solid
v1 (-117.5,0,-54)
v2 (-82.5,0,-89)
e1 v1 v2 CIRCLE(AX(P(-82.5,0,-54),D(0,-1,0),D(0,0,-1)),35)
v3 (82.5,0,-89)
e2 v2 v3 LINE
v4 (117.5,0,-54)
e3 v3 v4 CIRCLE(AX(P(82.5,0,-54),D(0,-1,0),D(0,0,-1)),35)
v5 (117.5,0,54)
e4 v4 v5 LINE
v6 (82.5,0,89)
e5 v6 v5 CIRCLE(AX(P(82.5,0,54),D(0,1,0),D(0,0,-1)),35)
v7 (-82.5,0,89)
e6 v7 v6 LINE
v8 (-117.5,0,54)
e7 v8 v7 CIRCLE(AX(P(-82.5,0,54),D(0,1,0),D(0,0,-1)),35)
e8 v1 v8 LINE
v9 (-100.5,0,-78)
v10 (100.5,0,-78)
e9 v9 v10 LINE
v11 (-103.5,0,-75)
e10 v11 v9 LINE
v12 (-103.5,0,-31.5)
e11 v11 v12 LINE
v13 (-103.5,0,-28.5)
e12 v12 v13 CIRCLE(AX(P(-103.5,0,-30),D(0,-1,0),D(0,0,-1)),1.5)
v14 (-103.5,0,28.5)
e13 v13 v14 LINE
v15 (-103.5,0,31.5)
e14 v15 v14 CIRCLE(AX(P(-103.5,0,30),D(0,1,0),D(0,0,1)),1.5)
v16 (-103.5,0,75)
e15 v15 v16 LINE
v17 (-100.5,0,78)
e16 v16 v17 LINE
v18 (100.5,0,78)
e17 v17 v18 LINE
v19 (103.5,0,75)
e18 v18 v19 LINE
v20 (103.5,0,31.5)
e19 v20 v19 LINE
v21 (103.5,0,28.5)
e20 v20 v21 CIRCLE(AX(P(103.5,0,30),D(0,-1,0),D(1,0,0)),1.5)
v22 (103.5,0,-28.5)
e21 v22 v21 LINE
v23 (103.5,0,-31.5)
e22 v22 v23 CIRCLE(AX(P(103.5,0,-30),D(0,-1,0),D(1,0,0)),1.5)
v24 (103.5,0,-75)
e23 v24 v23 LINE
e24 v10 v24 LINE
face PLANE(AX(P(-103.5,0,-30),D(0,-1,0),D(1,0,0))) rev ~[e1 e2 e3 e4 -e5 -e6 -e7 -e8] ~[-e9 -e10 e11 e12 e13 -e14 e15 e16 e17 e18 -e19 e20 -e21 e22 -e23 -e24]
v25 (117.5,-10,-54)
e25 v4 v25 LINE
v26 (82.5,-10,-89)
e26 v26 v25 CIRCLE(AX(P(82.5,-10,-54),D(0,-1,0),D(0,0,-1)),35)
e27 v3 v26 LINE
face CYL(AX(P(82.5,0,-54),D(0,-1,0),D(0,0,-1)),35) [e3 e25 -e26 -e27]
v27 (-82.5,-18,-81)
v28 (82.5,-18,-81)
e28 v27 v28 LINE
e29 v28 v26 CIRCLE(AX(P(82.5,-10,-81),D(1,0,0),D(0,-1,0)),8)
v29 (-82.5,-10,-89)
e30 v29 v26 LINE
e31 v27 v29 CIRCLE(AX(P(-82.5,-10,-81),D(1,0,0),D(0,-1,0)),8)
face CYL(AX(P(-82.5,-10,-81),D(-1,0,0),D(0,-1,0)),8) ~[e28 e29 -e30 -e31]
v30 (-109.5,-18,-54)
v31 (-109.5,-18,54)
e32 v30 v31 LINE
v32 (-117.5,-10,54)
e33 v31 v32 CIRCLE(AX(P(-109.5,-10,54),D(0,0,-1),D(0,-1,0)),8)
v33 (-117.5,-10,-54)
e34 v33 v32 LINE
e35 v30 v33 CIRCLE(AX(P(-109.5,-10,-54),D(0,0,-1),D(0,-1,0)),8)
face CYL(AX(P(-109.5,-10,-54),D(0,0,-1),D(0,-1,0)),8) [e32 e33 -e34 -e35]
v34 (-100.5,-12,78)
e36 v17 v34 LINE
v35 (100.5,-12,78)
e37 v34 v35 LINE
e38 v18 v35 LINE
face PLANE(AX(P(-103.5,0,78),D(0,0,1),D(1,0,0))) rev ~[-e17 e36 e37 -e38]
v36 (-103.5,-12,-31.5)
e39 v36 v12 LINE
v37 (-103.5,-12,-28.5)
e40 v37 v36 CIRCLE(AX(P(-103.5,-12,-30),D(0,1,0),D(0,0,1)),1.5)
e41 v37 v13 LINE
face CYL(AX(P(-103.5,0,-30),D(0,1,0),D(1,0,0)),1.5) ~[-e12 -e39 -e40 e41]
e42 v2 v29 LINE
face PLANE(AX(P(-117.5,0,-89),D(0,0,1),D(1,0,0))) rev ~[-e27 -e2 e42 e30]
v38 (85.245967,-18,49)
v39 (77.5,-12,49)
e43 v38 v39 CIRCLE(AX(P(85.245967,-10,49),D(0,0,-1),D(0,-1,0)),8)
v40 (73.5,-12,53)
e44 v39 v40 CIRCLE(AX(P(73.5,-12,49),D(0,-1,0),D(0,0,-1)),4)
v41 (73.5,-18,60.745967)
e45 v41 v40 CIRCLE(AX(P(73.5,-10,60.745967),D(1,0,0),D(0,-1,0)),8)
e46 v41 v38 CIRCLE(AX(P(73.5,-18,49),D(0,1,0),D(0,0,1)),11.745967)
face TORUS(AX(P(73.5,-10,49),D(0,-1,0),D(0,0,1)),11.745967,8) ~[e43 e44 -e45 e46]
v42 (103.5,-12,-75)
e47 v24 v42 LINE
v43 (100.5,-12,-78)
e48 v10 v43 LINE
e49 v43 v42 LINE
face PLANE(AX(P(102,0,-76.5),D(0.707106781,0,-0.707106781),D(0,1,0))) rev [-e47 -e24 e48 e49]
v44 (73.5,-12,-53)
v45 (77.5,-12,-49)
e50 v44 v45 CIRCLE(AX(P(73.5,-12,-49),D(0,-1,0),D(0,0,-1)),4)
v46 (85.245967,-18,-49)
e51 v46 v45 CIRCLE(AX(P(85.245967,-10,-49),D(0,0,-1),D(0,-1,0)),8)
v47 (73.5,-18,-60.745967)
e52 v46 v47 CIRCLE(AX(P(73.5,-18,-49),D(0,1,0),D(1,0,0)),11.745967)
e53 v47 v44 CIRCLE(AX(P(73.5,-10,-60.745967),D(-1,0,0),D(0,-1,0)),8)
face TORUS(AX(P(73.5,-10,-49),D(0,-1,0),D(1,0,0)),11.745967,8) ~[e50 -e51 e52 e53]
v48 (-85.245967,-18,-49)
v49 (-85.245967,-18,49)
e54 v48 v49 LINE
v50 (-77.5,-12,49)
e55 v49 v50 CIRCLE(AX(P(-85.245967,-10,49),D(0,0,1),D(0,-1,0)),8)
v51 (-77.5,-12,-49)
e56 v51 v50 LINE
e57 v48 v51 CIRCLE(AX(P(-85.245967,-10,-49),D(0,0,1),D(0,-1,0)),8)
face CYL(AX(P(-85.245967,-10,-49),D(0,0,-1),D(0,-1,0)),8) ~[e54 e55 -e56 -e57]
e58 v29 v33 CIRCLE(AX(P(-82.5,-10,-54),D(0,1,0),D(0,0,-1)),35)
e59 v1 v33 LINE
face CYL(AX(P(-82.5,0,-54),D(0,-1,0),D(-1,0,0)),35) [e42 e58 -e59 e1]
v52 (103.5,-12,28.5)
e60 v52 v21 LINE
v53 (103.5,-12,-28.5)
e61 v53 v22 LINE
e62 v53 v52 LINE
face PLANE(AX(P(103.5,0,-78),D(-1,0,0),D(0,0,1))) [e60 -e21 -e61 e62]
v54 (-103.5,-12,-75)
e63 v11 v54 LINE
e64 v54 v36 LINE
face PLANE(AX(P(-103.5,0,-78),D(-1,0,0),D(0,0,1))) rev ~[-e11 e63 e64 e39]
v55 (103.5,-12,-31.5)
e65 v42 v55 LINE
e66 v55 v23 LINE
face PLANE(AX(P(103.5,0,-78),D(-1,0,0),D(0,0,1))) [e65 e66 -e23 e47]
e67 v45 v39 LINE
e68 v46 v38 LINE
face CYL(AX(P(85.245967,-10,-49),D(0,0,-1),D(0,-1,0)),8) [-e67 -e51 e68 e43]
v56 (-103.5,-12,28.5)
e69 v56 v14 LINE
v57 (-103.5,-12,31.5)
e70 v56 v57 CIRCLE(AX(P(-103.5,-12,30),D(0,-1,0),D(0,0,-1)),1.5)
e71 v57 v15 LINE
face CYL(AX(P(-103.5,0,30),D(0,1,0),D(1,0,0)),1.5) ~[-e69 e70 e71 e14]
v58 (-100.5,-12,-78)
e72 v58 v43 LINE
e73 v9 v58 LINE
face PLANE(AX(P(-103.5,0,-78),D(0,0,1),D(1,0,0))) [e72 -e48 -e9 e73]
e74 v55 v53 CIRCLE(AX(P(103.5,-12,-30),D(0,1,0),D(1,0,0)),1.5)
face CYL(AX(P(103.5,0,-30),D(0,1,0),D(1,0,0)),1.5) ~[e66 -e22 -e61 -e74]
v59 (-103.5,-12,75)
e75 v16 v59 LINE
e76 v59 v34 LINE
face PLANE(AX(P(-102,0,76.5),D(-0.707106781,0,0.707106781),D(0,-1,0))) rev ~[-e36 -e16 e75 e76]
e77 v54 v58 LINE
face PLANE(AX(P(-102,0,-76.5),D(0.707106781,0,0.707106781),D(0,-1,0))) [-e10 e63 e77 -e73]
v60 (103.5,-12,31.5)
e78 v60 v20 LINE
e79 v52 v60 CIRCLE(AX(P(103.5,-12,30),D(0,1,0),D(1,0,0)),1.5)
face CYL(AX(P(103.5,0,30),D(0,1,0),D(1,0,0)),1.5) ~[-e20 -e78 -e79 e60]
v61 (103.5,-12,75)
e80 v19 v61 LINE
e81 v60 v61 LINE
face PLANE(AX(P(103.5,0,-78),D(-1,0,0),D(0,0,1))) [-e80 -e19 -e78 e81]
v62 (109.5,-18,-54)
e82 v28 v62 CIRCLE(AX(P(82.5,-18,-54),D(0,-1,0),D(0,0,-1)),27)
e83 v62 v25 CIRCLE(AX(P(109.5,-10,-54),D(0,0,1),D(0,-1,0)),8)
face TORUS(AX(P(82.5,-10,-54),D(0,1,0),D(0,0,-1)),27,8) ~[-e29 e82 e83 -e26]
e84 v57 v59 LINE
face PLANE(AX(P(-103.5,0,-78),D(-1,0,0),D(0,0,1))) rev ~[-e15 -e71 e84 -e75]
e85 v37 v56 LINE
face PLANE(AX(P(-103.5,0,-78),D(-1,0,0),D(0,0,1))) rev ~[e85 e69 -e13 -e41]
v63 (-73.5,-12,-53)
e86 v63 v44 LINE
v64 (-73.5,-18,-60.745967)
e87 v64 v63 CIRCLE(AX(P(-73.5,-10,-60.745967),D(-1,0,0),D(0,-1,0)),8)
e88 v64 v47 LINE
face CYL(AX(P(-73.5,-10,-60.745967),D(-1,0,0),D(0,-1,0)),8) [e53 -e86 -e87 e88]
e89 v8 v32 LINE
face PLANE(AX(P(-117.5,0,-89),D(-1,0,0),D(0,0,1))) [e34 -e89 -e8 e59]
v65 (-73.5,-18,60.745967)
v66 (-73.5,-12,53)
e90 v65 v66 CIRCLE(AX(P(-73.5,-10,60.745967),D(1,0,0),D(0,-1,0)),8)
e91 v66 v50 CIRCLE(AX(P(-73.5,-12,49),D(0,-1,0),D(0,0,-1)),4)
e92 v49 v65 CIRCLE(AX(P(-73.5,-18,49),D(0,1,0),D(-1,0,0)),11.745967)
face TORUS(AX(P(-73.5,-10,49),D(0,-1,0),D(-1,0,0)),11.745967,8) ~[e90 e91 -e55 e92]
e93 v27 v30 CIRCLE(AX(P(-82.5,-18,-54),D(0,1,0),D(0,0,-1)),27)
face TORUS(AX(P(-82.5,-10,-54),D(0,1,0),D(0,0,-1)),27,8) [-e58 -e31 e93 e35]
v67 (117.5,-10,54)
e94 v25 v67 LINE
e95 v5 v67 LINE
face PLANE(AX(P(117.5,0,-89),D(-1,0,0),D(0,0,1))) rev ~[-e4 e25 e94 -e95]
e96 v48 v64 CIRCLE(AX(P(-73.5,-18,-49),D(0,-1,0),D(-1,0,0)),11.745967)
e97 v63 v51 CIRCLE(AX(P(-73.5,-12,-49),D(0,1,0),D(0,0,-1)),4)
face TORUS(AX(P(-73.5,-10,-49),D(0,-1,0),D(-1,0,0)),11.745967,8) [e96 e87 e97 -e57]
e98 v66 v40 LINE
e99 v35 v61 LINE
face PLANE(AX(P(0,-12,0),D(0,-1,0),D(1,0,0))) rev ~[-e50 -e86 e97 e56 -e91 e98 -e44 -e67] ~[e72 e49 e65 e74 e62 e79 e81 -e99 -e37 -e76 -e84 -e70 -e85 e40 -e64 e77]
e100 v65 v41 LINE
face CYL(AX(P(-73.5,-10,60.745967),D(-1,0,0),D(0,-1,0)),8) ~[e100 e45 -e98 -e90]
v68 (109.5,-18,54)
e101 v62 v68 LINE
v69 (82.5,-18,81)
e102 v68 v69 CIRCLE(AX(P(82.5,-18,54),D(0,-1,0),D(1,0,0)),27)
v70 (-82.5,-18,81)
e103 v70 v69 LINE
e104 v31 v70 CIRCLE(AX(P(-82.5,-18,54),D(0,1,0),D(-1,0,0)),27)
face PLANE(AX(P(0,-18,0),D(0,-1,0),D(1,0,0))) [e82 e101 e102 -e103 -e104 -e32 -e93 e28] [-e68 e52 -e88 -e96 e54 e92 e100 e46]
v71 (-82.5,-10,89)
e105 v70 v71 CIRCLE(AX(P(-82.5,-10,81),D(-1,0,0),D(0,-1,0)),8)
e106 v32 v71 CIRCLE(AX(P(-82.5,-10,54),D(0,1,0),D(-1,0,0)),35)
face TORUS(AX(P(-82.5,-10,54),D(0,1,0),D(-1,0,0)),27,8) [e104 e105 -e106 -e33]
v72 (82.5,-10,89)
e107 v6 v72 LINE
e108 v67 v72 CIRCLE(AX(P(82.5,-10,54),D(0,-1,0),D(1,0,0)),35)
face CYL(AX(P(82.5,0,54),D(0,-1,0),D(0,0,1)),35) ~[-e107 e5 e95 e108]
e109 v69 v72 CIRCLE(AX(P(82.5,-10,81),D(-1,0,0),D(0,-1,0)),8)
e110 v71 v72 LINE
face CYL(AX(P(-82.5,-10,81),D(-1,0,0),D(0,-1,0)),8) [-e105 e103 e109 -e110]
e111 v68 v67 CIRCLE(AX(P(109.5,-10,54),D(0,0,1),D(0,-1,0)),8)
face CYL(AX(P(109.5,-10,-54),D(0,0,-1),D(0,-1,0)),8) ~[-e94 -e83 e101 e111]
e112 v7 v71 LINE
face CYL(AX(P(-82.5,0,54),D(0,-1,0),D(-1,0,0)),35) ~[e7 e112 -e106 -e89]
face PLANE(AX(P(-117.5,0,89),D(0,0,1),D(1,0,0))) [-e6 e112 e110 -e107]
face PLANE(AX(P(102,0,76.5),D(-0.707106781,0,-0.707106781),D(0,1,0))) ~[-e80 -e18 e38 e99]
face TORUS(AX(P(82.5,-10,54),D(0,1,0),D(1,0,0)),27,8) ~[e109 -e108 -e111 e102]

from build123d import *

# Parameters (mm, degrees)
F0_W         = 235
F0_H         = 178
F0_W_2       = 207
F0_H_2       = 156
F0_W_3       = 155
F0_H_3       = 106
F1_DEPTH     = 18
F2_DEPTH     = 12
F3_R         = 35
F4_R         = 4
F5_T1_DEPTH  = 98
F5_T3_DEPTH  = 147
F5_T5_DEPTH  = 165
F5_T7_DEPTH  = 108
F5_T10_ANGLE = 90
F5_T12_ANGLE = 90
F5_T14_ANGLE = 90
F5_T16_ANGLE = 90
F5_T18_ANGLE = 90
F5_T20_ANGLE = 90
F5_T22_ANGLE = 90
F5_T24_ANGLE = 90
F6_SIZE      = 3
F7_R         = 1.5
F8_DEPTH     = 16


# Not quite as in the source:
# - a fillet or chamfer that OpenCascade refuses, or shapes differently, is made with other operations: its cross-section is extruded or revolved along the edge and cut away or added


with BuildPart() as f1:
    # F0 (on Front) → F1 (new body)
    with BuildSketch(Plane.XZ):
        Rectangle(F0_W, F0_H)
        Rectangle(F0_W_2, F0_H_2, mode=Mode.SUBTRACT)
        Rectangle(F0_W_2, F0_H_2)
        Rectangle(F0_W_3, F0_H_3, mode=Mode.SUBTRACT)
    extrude(amount=F1_DEPTH)

    # F0 (on Front) → F2 (cut)
    with BuildSketch(Plane.XZ):
        Rectangle(F0_W_2, F0_H_2)
        Rectangle(F0_W_3, F0_H_3, mode=Mode.SUBTRACT)
    extrude(amount=F2_DEPTH, mode=Mode.SUBTRACT)

    # F3
    f3_edges = [f1.edges().sort_by_distance(p)[0] for p in [
        (117.5, -9, 89),
        (-117.5, -9, 89),
        (117.5, -9, -89),
        (-117.5, -9, -89),
    ]]
    fillet(f3_edges, radius=F3_R)

    # F4
    f4_edges = [f1.edges().sort_by_distance(p)[0] for p in [
        (-77.5, -15, 53),
        (77.5, -15, 53),
        (77.5, -15, -53),
        (-77.5, -15, -53),
    ]]
    fillet(f4_edges, radius=F4_R)

    # F5: fillet of radius 8 on 16 edges, made by hand

    # F5_s2 → F5_t1 (cut)
    with BuildSketch(Plane.XY.offset(-49)):
        with BuildLine():
            ThreePointArc((-85.2459666924, -18), (-80.3469872068, -16.3245553203), (-77.5, -12))
            Line((-77.5, -12), (-77.5, -18))
            Line((-77.5, -18), (-85.2459666924, -18))
        make_face()
        with BuildLine():
            ThreePointArc((85.2459666924, -18), (80.3469872068, -16.3245553203), (77.5, -12))
            Line((77.5, -12), (77.5, -18))
            Line((77.5, -18), (85.2459666924, -18))
        make_face()
    extrude(amount=F5_T1_DEPTH, mode=Mode.SUBTRACT)

    # F5_s4 → F5_t3 (cut)
    with BuildSketch(Plane.YZ.offset(-73.5)):
        with BuildLine():
            ThreePointArc((-18, -60.7459666924), (-16.3245553203, -55.8469872068), (-12, -53))
            Line((-12, -53), (-18, -53))
            Line((-18, -53), (-18, -60.7459666924))
        make_face()
        with BuildLine():
            ThreePointArc((-18, 60.7459666924), (-16.3245553203, 55.8469872068), (-12, 53))
            Line((-12, 53), (-18, 53))
            Line((-18, 53), (-18, 60.7459666924))
        make_face()
    extrude(amount=F5_T3_DEPTH, mode=Mode.SUBTRACT)

    # F5_s6 → F5_t5 (cut)
    with BuildSketch(Plane.YZ.offset(-82.5)):
        with BuildLine():
            ThreePointArc((-18, -81), (-15.6568542495, -86.6568542495), (-10, -89))
            Line((-10, -89), (-18, -89))
            Line((-18, -89), (-18, -81))
        make_face()
        with BuildLine():
            ThreePointArc((-18, 81), (-15.6568542495, 86.6568542495), (-10, 89))
            Line((-10, 89), (-18, 89))
            Line((-18, 89), (-18, 81))
        make_face()
    extrude(amount=F5_T5_DEPTH, mode=Mode.SUBTRACT)

    # F5_s8 → F5_t7 (cut)
    with BuildSketch(Plane.XY.offset(-54)):
        with BuildLine():
            ThreePointArc((-109.5, -18), (-115.1568542495, -15.6568542495), (-117.5, -10))
            Line((-117.5, -10), (-117.5, -18))
            Line((-117.5, -18), (-109.5, -18))
        make_face()
        with BuildLine():
            ThreePointArc((109.5, -18), (115.1568542495, -15.6568542495), (117.5, -10))
            Line((117.5, -10), (117.5, -18))
            Line((117.5, -18), (109.5, -18))
        make_face()
    extrude(amount=F5_T7_DEPTH, mode=Mode.SUBTRACT)

    # F5_s9 → F5_t10 (revolve, cut)
    with BuildSketch(Plane.XY.offset(-49)):
        with BuildLine():
            ThreePointArc((-85.2459666924, -18), (-80.3469872068, -16.3245553203), (-77.5, -12))
            Line((-77.5, -12), (-77.5, -18))
            Line((-77.5, -18), (-85.2459666924, -18))
        make_face()
    revolve(axis=Axis((-73.5, -18, -49), (0, -1, 0)), revolution_arc=F5_T10_ANGLE, mode=Mode.SUBTRACT)

    # F5_s11 → F5_t12 (revolve, cut)
    with BuildSketch(Plane.XY.offset(49)):
        with BuildLine():
            ThreePointArc((-85.2459666924, -18), (-80.3469872068, -16.3245553203), (-77.5, -12))
            Line((-77.5, -12), (-77.5, -18))
            Line((-77.5, -18), (-85.2459666924, -18))
        make_face()
    revolve(axis=Axis((-73.5, -18, 49), (0, 1, 0)), revolution_arc=F5_T12_ANGLE, mode=Mode.SUBTRACT)

    # F5_s13 → F5_t14 (revolve, cut)
    with BuildSketch(Plane.XY.offset(-49)):
        with BuildLine():
            ThreePointArc((85.2459666924, -18), (80.3469872068, -16.3245553203), (77.5, -12))
            Line((77.5, -12), (77.5, -18))
            Line((77.5, -18), (85.2459666924, -18))
        make_face()
    revolve(axis=Axis((73.5, -18, -49), (0, 1, 0)), revolution_arc=F5_T14_ANGLE, mode=Mode.SUBTRACT)

    # F5_s15 → F5_t16 (revolve, cut)
    with BuildSketch(Plane.YZ.offset(73.5)):
        with BuildLine():
            ThreePointArc((-18, 60.7459666924), (-16.3245553203, 55.8469872068), (-12, 53))
            Line((-12, 53), (-18, 53))
            Line((-18, 53), (-18, 60.7459666924))
        make_face()
    revolve(axis=Axis((73.5, -18, 49), (0, 1, 0)), revolution_arc=F5_T16_ANGLE, mode=Mode.SUBTRACT)

    # F5_s17 → F5_t18 (revolve, cut)
    with BuildSketch(Plane.YZ.offset(-82.5)):
        with BuildLine():
            ThreePointArc((-18, -81), (-15.6568542495, -86.6568542495), (-10, -89))
            Line((-10, -89), (-18, -89))
            Line((-18, -89), (-18, -81))
        make_face()
    revolve(axis=Axis((-82.5, -18, -54), (0, 1, 0)), revolution_arc=F5_T18_ANGLE, mode=Mode.SUBTRACT)

    # F5_s19 → F5_t20 (revolve, cut)
    with BuildSketch(Plane.YZ.offset(82.5)):
        with BuildLine():
            ThreePointArc((-18, -81), (-15.6568542495, -86.6568542495), (-10, -89))
            Line((-10, -89), (-18, -89))
            Line((-18, -89), (-18, -81))
        make_face()
    revolve(axis=Axis((82.5, -18, -54), (0, -1, 0)), revolution_arc=F5_T20_ANGLE, mode=Mode.SUBTRACT)

    # F5_s21 → F5_t22 (revolve, cut)
    with BuildSketch(Plane.XY.offset(54)):
        with BuildLine():
            ThreePointArc((-109.5, -18), (-115.1568542495, -15.6568542495), (-117.5, -10))
            Line((-117.5, -10), (-117.5, -18))
            Line((-117.5, -18), (-109.5, -18))
        make_face()
    revolve(axis=Axis((-82.5, -18, 54), (0, 1, 0)), revolution_arc=F5_T22_ANGLE, mode=Mode.SUBTRACT)

    # F5_s23 → F5_t24 (revolve, cut)
    with BuildSketch(Plane.XY.offset(54)):
        with BuildLine():
            ThreePointArc((109.5, -18), (115.1568542495, -15.6568542495), (117.5, -10))
            Line((117.5, -10), (117.5, -18))
            Line((117.5, -18), (109.5, -18))
        make_face()
    revolve(axis=Axis((82.5, -18, 54), (0, -1, 0)), revolution_arc=F5_T24_ANGLE, mode=Mode.SUBTRACT)

    # F6
    f6_edges = [f1.edges().sort_by_distance(p)[0] for p in [
        (-103.5, -6, -78),
        (103.5, -6, -78),
        (-103.5, -6, 78),
        (103.5, -6, 78),
    ]]
    chamfer(f6_edges, length=F6_SIZE)

    # F7 (on face) → F8 (join)
    with BuildSketch(Plane.XZ):
        with Locations((-103.5, -30)):
            Circle(F7_R)
        with Locations((-103.5, 30)):
            Circle(F7_R)
        with Locations((103.5, -30)):
            Circle(F7_R)
        with Locations((103.5, 30)):
            Circle(F7_R)
    extrude(amount=F8_DEPTH)


solid = f1.part
